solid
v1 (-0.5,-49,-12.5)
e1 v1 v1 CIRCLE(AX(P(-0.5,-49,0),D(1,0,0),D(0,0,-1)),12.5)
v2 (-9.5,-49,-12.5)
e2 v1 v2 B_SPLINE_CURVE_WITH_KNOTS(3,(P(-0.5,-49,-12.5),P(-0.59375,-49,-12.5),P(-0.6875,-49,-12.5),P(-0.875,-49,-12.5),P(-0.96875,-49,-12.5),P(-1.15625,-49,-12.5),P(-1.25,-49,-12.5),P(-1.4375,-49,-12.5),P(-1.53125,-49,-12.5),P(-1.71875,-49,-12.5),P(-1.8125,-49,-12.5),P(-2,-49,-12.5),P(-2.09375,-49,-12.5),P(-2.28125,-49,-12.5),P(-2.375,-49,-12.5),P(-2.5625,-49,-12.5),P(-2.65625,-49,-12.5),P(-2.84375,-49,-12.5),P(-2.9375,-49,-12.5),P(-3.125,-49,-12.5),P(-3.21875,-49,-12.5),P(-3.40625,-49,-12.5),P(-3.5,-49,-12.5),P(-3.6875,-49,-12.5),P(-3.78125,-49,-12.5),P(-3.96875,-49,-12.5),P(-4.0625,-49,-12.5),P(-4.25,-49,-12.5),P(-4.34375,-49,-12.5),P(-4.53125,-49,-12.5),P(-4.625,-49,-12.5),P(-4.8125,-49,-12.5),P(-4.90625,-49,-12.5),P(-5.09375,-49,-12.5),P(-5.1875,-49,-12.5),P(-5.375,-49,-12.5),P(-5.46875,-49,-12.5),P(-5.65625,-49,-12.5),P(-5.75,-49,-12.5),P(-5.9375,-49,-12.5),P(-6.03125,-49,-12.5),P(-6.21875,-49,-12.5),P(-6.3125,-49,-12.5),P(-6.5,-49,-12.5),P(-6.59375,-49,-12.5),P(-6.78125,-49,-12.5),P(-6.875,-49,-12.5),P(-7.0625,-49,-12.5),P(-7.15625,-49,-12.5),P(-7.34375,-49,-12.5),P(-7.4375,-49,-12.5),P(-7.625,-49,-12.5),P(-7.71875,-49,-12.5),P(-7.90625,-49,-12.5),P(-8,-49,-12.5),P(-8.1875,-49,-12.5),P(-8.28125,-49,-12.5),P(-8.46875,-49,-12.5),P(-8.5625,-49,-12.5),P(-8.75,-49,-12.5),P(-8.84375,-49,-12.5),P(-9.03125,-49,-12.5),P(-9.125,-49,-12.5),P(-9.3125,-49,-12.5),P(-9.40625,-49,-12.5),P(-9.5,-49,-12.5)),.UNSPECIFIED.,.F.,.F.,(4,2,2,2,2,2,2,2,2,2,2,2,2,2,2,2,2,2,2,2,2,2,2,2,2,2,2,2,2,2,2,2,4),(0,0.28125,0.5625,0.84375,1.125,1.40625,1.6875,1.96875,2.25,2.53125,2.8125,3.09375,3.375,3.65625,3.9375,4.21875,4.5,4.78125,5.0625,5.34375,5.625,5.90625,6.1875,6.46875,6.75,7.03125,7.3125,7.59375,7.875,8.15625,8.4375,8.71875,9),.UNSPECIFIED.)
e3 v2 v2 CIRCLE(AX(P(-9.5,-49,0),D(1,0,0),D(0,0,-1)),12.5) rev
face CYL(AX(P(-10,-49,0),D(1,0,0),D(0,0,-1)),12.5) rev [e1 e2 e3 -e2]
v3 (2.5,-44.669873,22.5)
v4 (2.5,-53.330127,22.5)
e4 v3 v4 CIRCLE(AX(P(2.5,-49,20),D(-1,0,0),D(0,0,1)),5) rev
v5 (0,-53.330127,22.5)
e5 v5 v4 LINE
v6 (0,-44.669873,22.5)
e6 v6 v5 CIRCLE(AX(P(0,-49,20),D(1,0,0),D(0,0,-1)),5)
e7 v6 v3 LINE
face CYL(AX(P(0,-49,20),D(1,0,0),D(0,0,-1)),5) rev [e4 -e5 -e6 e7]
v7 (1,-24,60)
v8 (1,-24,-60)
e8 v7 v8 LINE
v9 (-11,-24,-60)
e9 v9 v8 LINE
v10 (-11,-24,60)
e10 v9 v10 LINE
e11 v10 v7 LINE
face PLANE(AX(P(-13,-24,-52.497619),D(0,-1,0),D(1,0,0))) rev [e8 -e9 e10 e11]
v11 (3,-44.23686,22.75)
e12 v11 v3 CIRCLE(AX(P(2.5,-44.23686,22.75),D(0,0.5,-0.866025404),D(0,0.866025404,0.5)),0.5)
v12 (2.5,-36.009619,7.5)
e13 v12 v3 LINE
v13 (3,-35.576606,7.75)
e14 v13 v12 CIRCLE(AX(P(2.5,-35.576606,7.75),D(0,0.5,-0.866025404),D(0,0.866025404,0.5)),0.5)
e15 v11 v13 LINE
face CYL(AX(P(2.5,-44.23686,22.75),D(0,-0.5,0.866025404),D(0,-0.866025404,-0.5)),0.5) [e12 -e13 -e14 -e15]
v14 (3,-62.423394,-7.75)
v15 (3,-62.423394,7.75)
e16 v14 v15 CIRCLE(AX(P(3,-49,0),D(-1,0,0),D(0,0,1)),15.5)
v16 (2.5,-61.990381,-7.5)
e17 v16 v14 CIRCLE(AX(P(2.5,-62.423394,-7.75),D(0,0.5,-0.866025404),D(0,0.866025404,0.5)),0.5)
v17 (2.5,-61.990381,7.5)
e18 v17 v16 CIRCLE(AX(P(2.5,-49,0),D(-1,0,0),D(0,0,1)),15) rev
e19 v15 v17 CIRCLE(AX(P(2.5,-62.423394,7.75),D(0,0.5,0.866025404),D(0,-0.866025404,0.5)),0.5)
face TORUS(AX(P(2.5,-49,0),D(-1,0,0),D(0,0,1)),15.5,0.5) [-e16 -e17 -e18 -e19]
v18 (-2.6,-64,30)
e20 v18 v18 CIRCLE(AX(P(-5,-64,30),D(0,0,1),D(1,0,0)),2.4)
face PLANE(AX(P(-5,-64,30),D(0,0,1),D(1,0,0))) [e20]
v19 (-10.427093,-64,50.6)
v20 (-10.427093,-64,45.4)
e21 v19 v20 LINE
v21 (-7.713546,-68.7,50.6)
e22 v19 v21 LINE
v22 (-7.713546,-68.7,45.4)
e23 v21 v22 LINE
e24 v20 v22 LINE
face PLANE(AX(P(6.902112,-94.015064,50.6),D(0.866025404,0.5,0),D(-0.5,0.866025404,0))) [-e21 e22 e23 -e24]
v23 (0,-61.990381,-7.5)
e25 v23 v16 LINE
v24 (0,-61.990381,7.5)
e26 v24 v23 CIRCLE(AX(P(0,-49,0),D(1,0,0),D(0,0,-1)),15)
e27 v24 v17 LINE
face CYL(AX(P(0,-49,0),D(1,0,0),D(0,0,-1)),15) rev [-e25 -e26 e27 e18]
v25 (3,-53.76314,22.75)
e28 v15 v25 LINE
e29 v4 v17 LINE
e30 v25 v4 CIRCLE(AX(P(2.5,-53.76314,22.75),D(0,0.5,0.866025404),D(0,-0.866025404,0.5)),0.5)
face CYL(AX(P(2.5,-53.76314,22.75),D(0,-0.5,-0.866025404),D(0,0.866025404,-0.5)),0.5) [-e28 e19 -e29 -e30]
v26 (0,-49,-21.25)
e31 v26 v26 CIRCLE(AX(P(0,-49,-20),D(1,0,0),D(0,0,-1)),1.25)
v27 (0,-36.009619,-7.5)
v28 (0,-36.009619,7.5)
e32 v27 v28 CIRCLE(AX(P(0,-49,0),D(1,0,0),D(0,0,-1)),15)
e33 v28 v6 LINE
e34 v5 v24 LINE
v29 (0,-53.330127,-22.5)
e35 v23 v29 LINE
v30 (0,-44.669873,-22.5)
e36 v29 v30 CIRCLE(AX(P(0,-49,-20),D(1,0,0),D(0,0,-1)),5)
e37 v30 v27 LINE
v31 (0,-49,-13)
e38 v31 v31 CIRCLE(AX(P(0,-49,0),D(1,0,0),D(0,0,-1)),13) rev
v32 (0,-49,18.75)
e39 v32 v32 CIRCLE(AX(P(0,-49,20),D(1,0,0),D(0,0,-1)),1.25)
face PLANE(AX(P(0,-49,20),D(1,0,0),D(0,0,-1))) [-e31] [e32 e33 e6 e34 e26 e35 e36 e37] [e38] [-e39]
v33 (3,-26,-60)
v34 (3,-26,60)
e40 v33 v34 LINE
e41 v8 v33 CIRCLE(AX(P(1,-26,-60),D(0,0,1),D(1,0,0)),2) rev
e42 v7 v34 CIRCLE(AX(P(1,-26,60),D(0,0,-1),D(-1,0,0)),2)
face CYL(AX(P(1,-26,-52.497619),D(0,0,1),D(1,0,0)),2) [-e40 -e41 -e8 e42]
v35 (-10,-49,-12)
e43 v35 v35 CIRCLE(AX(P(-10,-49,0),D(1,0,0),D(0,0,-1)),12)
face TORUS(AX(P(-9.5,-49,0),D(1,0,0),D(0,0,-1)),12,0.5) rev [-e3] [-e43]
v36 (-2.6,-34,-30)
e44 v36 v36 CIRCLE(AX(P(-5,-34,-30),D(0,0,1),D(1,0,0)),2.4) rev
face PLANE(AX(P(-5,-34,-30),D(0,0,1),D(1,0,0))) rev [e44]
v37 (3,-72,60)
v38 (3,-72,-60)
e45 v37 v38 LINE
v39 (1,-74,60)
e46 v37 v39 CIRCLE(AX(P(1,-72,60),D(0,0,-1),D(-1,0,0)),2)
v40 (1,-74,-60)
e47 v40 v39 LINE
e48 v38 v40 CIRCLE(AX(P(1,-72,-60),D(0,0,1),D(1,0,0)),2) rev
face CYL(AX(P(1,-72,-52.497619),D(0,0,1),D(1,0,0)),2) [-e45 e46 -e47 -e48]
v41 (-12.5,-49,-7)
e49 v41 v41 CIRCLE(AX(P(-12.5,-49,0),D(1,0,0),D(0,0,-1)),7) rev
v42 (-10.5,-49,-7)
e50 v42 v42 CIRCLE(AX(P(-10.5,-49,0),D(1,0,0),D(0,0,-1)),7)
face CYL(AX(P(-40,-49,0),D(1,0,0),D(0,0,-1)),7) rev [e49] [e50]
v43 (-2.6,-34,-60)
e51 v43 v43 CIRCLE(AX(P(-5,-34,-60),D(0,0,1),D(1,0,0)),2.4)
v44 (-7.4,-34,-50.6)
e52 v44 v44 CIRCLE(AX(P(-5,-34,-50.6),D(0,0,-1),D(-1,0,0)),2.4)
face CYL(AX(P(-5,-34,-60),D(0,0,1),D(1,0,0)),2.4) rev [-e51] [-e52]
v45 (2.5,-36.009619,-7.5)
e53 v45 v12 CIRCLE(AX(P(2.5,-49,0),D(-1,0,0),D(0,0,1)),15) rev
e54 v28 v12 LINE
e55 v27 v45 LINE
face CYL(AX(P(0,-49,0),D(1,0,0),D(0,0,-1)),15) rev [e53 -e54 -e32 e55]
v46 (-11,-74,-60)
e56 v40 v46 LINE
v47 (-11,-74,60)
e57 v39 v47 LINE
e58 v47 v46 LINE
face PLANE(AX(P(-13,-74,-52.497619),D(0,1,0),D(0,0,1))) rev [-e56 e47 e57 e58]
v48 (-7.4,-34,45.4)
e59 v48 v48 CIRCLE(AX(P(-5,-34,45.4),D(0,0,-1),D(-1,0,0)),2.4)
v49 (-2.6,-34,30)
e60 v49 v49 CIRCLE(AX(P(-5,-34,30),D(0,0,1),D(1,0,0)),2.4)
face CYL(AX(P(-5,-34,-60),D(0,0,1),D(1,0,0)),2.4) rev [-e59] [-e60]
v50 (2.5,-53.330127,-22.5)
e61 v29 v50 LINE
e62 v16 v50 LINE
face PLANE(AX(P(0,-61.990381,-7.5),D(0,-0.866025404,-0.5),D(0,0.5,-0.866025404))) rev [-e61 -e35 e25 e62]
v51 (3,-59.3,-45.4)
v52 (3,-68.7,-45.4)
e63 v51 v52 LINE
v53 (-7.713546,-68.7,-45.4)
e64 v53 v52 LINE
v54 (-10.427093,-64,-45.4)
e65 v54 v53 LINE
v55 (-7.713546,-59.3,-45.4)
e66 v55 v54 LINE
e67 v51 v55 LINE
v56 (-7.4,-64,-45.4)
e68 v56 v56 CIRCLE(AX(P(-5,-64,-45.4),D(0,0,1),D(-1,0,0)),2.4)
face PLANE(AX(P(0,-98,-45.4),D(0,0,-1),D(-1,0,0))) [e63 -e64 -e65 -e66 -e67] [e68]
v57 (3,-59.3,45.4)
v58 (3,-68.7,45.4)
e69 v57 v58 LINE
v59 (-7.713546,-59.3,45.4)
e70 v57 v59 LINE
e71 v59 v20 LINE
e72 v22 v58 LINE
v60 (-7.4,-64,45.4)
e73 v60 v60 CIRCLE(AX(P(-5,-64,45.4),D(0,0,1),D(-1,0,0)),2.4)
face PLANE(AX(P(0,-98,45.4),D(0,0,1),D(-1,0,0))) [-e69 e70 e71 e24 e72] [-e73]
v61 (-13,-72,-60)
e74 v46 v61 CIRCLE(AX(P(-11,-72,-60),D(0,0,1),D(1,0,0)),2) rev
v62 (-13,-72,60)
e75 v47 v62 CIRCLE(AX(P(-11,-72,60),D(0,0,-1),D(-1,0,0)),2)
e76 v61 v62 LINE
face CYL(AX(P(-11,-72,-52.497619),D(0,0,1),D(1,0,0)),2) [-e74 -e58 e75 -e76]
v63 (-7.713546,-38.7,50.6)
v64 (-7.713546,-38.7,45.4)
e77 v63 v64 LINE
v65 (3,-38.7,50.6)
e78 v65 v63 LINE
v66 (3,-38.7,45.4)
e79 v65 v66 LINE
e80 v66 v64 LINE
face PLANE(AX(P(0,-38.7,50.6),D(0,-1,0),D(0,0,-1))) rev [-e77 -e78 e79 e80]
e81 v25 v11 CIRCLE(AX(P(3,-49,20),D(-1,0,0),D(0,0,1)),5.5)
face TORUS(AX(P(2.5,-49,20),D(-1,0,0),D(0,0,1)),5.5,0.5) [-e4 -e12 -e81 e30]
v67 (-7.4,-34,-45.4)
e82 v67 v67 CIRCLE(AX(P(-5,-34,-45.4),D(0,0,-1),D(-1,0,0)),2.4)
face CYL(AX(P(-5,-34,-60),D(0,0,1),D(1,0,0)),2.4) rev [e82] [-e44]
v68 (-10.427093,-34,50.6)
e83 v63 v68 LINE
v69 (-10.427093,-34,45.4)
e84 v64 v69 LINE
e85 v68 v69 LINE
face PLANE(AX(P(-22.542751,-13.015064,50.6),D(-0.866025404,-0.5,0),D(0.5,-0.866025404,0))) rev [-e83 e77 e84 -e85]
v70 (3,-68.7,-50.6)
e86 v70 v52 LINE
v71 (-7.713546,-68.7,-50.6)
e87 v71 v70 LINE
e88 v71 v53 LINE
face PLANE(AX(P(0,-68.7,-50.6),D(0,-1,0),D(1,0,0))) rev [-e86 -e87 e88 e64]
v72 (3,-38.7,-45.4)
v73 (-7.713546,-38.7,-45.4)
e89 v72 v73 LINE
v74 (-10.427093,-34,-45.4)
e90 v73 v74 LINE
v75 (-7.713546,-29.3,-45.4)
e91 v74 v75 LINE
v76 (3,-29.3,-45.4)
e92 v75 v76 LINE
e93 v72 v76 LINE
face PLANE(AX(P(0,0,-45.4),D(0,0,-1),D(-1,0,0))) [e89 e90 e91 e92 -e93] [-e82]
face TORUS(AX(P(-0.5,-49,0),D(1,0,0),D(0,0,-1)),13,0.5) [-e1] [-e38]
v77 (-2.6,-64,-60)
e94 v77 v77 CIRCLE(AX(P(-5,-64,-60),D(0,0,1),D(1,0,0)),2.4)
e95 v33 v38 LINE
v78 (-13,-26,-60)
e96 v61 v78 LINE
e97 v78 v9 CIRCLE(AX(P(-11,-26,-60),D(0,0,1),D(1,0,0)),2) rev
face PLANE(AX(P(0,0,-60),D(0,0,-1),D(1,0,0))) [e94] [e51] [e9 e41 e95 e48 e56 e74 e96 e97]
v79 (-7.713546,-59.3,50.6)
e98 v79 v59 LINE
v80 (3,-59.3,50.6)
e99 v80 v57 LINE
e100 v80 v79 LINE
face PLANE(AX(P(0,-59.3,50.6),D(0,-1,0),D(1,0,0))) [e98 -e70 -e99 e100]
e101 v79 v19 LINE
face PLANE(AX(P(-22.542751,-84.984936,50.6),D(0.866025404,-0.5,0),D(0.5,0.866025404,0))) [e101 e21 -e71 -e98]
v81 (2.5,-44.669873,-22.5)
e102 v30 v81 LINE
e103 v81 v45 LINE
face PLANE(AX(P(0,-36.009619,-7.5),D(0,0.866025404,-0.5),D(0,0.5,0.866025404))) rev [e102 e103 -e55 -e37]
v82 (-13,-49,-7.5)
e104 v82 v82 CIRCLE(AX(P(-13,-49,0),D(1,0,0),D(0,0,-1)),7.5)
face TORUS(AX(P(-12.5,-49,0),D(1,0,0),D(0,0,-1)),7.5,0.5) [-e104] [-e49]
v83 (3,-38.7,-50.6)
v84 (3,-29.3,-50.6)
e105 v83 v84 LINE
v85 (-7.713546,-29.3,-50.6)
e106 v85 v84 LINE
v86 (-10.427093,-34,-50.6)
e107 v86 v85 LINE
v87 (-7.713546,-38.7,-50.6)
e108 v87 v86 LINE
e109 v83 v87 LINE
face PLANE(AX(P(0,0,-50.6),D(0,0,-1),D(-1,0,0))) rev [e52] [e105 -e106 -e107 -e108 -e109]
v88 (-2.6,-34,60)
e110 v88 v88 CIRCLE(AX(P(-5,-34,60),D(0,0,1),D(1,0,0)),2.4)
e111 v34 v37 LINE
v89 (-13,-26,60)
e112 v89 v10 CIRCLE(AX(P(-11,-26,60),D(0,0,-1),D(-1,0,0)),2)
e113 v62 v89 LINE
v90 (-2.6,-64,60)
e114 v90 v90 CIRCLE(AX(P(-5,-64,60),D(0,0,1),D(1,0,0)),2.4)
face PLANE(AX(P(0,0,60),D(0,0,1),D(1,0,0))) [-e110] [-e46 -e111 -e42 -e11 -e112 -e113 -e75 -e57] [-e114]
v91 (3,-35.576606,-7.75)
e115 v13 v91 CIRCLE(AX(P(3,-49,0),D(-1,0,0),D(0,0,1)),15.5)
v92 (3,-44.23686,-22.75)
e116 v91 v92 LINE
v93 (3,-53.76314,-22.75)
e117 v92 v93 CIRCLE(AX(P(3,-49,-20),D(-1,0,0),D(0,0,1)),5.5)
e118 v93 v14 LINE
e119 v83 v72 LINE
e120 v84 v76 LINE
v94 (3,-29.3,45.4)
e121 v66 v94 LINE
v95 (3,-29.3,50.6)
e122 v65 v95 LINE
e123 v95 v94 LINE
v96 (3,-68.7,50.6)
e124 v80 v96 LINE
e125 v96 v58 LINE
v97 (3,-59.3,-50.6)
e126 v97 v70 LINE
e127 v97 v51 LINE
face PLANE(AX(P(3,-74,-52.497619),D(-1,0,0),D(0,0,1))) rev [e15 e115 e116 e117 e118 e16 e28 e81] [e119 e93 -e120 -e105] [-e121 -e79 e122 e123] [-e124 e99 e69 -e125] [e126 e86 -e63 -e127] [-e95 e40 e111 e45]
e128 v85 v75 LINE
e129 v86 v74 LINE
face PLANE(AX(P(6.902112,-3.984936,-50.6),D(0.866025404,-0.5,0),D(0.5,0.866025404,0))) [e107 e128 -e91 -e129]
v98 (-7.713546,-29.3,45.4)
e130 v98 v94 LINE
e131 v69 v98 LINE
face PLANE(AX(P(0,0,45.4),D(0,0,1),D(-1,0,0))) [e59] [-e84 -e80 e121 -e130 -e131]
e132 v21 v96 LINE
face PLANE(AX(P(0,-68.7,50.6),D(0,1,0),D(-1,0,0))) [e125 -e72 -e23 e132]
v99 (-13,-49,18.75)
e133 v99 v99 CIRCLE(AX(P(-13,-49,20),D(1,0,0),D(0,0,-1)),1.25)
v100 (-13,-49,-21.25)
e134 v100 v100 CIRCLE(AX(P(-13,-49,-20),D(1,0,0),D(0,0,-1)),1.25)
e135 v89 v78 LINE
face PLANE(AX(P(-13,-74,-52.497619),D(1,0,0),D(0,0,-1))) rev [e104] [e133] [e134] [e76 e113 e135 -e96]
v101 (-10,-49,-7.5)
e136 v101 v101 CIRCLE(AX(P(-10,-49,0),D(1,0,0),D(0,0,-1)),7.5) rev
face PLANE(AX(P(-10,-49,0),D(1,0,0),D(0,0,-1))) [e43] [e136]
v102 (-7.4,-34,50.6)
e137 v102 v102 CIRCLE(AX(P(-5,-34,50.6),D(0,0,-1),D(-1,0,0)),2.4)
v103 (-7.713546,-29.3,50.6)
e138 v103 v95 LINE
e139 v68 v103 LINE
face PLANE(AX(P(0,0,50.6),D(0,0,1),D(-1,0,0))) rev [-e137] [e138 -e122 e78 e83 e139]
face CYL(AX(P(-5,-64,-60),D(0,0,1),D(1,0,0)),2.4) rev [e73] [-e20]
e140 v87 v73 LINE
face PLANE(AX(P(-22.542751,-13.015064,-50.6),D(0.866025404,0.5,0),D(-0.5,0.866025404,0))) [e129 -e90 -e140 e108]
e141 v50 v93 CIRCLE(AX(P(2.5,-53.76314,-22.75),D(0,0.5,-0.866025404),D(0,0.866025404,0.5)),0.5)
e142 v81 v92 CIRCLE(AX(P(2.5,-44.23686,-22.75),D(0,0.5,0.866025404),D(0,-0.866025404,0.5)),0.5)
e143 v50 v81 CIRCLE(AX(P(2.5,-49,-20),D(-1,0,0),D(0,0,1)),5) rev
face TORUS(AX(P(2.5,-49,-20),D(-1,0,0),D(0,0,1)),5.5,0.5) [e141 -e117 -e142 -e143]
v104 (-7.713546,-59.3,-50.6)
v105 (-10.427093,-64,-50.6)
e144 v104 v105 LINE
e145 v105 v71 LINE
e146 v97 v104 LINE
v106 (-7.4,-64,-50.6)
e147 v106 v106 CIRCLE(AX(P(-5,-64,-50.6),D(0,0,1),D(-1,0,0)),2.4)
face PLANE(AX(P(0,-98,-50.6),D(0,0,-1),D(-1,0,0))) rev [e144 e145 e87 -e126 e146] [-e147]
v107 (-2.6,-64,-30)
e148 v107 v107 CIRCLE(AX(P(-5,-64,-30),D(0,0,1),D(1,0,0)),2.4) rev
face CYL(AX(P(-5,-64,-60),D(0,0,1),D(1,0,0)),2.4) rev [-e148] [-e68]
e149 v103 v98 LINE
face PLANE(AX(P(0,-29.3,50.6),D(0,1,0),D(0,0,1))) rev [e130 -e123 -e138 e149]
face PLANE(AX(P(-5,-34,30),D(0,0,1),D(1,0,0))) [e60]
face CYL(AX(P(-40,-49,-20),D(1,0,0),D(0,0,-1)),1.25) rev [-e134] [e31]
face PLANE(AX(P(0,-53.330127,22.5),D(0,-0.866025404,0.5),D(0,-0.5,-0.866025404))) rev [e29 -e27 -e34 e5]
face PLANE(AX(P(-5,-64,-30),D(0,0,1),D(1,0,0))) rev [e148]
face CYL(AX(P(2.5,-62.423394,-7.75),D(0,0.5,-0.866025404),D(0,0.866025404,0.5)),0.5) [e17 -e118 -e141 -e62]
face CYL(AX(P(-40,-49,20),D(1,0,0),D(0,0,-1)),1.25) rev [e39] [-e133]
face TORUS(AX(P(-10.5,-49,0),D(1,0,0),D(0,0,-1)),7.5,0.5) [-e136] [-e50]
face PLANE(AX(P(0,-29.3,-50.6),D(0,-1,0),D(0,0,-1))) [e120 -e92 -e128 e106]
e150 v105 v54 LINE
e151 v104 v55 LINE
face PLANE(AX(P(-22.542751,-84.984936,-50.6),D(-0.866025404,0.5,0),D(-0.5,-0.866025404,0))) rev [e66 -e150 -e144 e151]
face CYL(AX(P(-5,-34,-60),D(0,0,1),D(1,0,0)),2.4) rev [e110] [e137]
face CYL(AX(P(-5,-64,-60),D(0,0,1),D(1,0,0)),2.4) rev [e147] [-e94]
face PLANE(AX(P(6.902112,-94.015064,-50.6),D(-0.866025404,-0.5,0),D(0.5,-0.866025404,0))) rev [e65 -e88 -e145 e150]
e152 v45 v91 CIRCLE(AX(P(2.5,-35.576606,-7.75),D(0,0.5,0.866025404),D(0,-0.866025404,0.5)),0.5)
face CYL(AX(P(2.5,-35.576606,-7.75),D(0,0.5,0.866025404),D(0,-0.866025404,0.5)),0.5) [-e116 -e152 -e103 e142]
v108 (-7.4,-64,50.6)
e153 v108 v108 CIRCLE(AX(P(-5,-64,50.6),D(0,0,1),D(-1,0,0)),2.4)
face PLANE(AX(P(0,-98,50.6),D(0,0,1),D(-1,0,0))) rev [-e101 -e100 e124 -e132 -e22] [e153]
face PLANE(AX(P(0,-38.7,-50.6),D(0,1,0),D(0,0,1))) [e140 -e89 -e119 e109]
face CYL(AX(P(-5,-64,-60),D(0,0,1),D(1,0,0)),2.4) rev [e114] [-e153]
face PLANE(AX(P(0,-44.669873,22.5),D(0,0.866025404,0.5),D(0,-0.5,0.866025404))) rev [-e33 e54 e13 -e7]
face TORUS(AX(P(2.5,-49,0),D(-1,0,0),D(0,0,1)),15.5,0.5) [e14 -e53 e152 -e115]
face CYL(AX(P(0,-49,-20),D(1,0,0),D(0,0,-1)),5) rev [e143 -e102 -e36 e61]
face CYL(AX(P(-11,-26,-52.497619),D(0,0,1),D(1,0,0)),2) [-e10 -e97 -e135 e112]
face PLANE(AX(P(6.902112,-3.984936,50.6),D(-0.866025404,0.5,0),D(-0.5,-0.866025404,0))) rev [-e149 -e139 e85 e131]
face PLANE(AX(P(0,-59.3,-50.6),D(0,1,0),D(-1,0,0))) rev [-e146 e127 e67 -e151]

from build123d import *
from build123d.topology import SkipClean

# Parameters (mm, degrees)
SKETCH2_R                = 12.5
BOSS_EXTRUDE1_DEPTH      = 15
SKETCH13_W               = 16
SKETCH13_H               = 50
BOSS_EXTRUDE5_DEPTH      = 45
SKETCH14_R               = 12.5
CUT_EXTRUDE1_DEPTH       = 13
SKETCH15_R               = 1.25
CUT_EXTRUDE2_DEPTH       = 3
SKETCH16_R               = 7
SKETCH16_R_2             = 1.25
CUT_EXTRUDE3_DEPTH       = 116.628716156
FILLET3_R                = 0.5
FILLET4_R                = 0.5
FILLET5_R                = 0.5
BOSS_EXTRUDE7_DEPTH      = 15
BOSS_EXTRUDE8_START      = 10
SKETCH23_R               = 22
SKETCH23_R_2             = 12.5
BOSS_EXTRUDE8_DEPTH      = 10
SKETCH24_R               = 12.5
CUT_EXTRUDE4_DEPTH       = 147.049569685
SKETCH25_R               = 12.5
SKETCH25_R_2             = 7
BOSS_EXTRUDE9_DEPTH      = 2
CUT_EXTRUDE5_DEPTH       = 3
SKETCH27_R               = 1.15
CUT_EXTRUDE6_DEPTH       = 8
SKETCH28_R               = 20
BOSS_EXTRUDE10_DEPTH     = 2
BOSS_EXTRUDE11_DEPTH     = 20
SKETCH30_R               = 5
CUT_EXTRUDE7_DEPTH       = 10
SKETCH31_R               = 1.9
CUT_EXTRUDE8_DEPTH       = 12
CUT_EXTRUDE9_DEPTH       = 3
SKETCH33_R               = 1.15
CUT_EXTRUDE10_DEPTH      = 8
FILLET6_R                = 1
FILLET7_R                = 1
FILLET8_R                = 2
FILLET9_R                = 2
SKETCH35_R               = 2.4
CUT_EXTRUDE12_DEPTH      = 164.418104317
CUT_EXTRUDE15_DEPTH      = 153.743172808
SKETCH41_W               = 165.446496504
SKETCH41_H               = 185.397374106
CUT_EXTRUDE16_DEPTH      = 153.74317274
SKETCH42_R               = 2.4
BOSS_EXTRUDE12_DEPTH     = 30
SKETCH44_R               = 2.4
CUT_EXTRUDE17_DEPTH      = 2.6
MIRROR16_COPY_1_SKETCH_R = 2.4
MIRROR16_COPY_1_DEPTH    = 2.6


# Some blends are built 0.0001 mm under size
with BuildPart() as part:
    # Sketch2 → Boss-Extrude1 (new body)
    with BuildSketch(Plane.XY.offset(60)):
        with BuildLine():
            Line((-39.322032275, -7.333333333), (-28.508473399, -65.316666667))
            ThreePointArc((-28.508473399, -65.316666667), (0, -89), (28.508473399, -65.316666667))
            Line((28.508473399, -65.316666667), (39.322032275, -7.333333333))
            ThreePointArc((39.322032275, -7.333333333), (0, 40), (-39.322032275, -7.333333333))
        make_face()
        Circle(SKETCH2_R, mode=Mode.SUBTRACT)
    boss_extrude1 = extrude(amount=-BOSS_EXTRUDE1_DEPTH)

    # Sketch13 → Boss-Extrude5 (add)
    with BuildSketch(Plane(origin=(0, 0, 45), x_dir=(-1, 0, 0), z_dir=(0, 0, -1))):
        with Locations((5, -49)):
            Rectangle(SKETCH13_W, SKETCH13_H)
    boss_extrude5 = extrude(amount=BOSS_EXTRUDE5_DEPTH)

    # Mirror2: Boss-Extrude5 across plane
    add(boss_extrude5.mirror(Plane.XY))

    # Mirror4: Boss-Extrude1 across plane
    add(boss_extrude1.mirror(Plane.XY))

    # Sketch14 → Cut-Extrude1 (cut)
    with BuildSketch(Plane(origin=(3, 0, 0), x_dir=(0, 0, -1), z_dir=(1, 0, 0))):
        with Locations((0, -49)):
            Circle(SKETCH14_R)
    extrude(amount=-CUT_EXTRUDE1_DEPTH, mode=Mode.SUBTRACT)

    # Sketch15 → Cut-Extrude2 (cut)
    with BuildSketch(Plane(origin=(3, 0, 0), x_dir=(0, 0, -1), z_dir=(1, 0, 0))):
        with BuildLine():
            Line((-22.5, -44.669872981), (-7.5, -36.009618943))
            ThreePointArc((-7.5, -36.009618943), (0, -34), (7.5, -36.009618943))
            Line((7.5, -36.009618943), (22.5, -44.669872981))
            ThreePointArc((22.5, -44.669872981), (25, -49), (22.5, -53.330127019))
            Line((22.5, -53.330127019), (7.5, -61.990381057))
            ThreePointArc((7.5, -61.990381057), (0, -64), (-7.5, -61.990381057))
            Line((-7.5, -61.990381057), (-22.5, -53.330127019))
            ThreePointArc((-22.5, -53.330127019), (-25, -49), (-22.5, -44.669872981))
        make_face()
        with Locations((20, -49)):
            Circle(SKETCH15_R, mode=Mode.SUBTRACT)
        with Locations((-20, -49)):
            Circle(SKETCH15_R, mode=Mode.SUBTRACT)
    extrude(amount=-CUT_EXTRUDE2_DEPTH, mode=Mode.SUBTRACT)

    # Sketch16 → Cut-Extrude3 (cut, through all)
    with BuildSketch(Plane(origin=(3, 0, 0), x_dir=(0, 0, -1), z_dir=(1, 0, 0))):
        with Locations((0, -49)):
            Circle(SKETCH16_R)
        with Locations((20, -49)):
            Circle(SKETCH16_R_2)
        with Locations((-20, -49)):
            Circle(SKETCH16_R_2)
    extrude(amount=-CUT_EXTRUDE3_DEPTH, mode=Mode.SUBTRACT)

    # Fillet3
    fillet3_edges = [part.edges().sort_by_distance(p)[0] for p in [
        (-10, -49, 7),
        (-10, -49, 12.5),
        (0, -49, 12.5),
    ]]
    fillet(fillet3_edges, radius=FILLET3_R)

    # Fillet4
    fillet4_edges = [part.edges().sort_by_distance(p)[0] for p in [
        (-13, -49, 7),
    ]]
    fillet(fillet4_edges, radius=FILLET4_R)

    # Fillet5
    fillet5_edges = [part.edges().sort_by_distance(p)[0] for p in [
        (3, -49, 25),
        (3, -57.660254038, 15),
        (3, -64, 0),
        (3, -57.660254038, -15),
        (3, -49, -25),
        (3, -40.339745962, -15),
        (3, -34, 0),
        (3, -40.339745962, 15),
    ]]
    fillet(fillet5_edges, radius=FILLET5_R)

    # Sketch21 → Boss-Extrude7 (add)
    with BuildSketch(Plane(origin=(0, 0, 45), x_dir=(-1, 0, 0), z_dir=(0, 0, -1))):
        with BuildLine():
            Line((63.949121417, -39.274799426), (35.879526324, 17.682182861))
            ThreePointArc((35.879526324, 17.682182861), (39.626539296, 5.453199377), (39.322032275, -7.333333333))
            Line((39.322032275, -7.333333333), (32.183280175, -45.612002486))
            ThreePointArc((32.183280175, -45.612002486), (45.925459124, -36.617527064), (56.715381939, -49))
            ThreePointArc((56.715381939, -49), (43.626354657, -61.486114162), (31.770894441, -47.823254098))
            Line((31.770894441, -47.823254098), (28.508473399, -65.316666667))
            ThreePointArc((28.508473399, -65.316666667), (22.576057553, -78.202242316), (11.241719496, -86.732447377))
            Line((11.241719496, -86.732447377), (52.743582936, -69.279787666))
            ThreePointArc((52.743582936, -69.279787666), (64.82506776, -56.696807802), (63.949121417, -39.274799426))
        make_face()
        with BuildLine():
            ThreePointArc((39.322032275, -7.333333333), (39.626539296, 5.453199377), (35.879526324, 17.682182861))
            Line((35.879526324, 17.682182861), (11.241719496, -86.732447377))
            ThreePointArc((11.241719496, -86.732447377), (22.576057553, -78.202242316), (28.508473399, -65.316666667))
            Line((28.508473399, -65.316666667), (31.770894441, -47.823254098))
            ThreePointArc((31.770894441, -47.823254098), (31.927246853, -46.708333333), (32.183280175, -45.612002486))
            Line((32.183280175, -45.612002486), (39.322032275, -7.333333333))
        make_face()
    boss_extrude7 = extrude(amount=-BOSS_EXTRUDE7_DEPTH)

    # Sketch23 → Boss-Extrude8 (add)
    with SkipClean():  # the faces are left unmerged after this step: merging them gives an invalid solid
        with BuildSketch(Plane(origin=(0, 0, 45), x_dir=(-1, 0, 0), z_dir=(0, 0, -1)).offset(BOSS_EXTRUDE8_START)):
            with Locations((44.215381939, -49)):
                Circle(SKETCH23_R)
            with Locations((44.215381939, -49)):
                Circle(SKETCH23_R_2, mode=Mode.SUBTRACT)
        boss_extrude8 = extrude(amount=-BOSS_EXTRUDE8_DEPTH)

    # Sketch24 → Cut-Extrude4 (cut, through all)
    with SkipClean():  # the faces are left unmerged after this step: merging them gives an invalid solid
        with BuildSketch(Plane(origin=(0, 0, 35), x_dir=(-1, 0, 0), z_dir=(0, 0, -1))):
            with Locations((44.215381939, -49)):
                Circle(SKETCH24_R)
        cut_extrude4 = extrude(amount=-CUT_EXTRUDE4_DEPTH, mode=Mode.SUBTRACT)
    add(part.part.scale(1), mode=Mode.REPLACE)  # the faces are merged on a copy

    # Sketch25 → Boss-Extrude9 (add)
    with BuildSketch(Plane(origin=(0, 0, 35), x_dir=(-1, 0, 0), z_dir=(0, 0, -1))):
        with Locations((44.215381939, -49)):
            Circle(SKETCH25_R)
        with Locations((44.215381939, -49)):
            Circle(SKETCH25_R_2, mode=Mode.SUBTRACT)
    boss_extrude9 = extrude(amount=-BOSS_EXTRUDE9_DEPTH)

    # Sketch26 → Cut-Extrude5 (cut)
    with BuildSketch(Plane.XY.offset(60)):
        with BuildLine():
            Line((-34.573567794, -37.509333353), (-47.841846757, -26.375925369))
            ThreePointArc((-47.841846757, -26.375925369), (-52.765885522, -25.50768448), (-55.97982357, -29.337906696))
            Line((-55.97982357, -29.337906696), (-58.987498234, -46.395277335))
            ThreePointArc((-58.987498234, -46.395277335), (-58.310771251, -54.13030215), (-53.857196084, -60.490666647))
            Line((-53.857196084, -60.490666647), (-40.588917121, -71.624074631))
            ThreePointArc((-40.588917121, -71.624074631), (-35.664878356, -72.49231552), (-32.450940307, -68.662093304))
            Line((-32.450940307, -68.662093304), (-29.443265644, -51.604722665))
            ThreePointArc((-29.443265644, -51.604722665), (-30.119992627, -43.86969785), (-34.573567794, -37.509333353))
        make_face()
    cut_extrude5 = extrude(amount=-CUT_EXTRUDE5_DEPTH, mode=Mode.SUBTRACT)

    # Sketch27 → Cut-Extrude6 (cut)
    with BuildSketch(Plane.XY.offset(57)):
        with Locations((-51.055784805, -30.206147584)):
            Circle(SKETCH27_R)
        with Locations((-37.374979072, -67.793852416)):
            Circle(SKETCH27_R)
    cut_extrude6 = extrude(amount=-CUT_EXTRUDE6_DEPTH, mode=Mode.SUBTRACT)

    # Mirror12: Boss-Extrude7, Boss-Extrude8, Cut-Extrude4, Boss-Extrude9, Cut-Extrude5, Cut-Extrude6 across plane
    with SkipClean():  # the faces are left unmerged after this step: merging them gives an invalid solid
        add(boss_extrude7.mirror(Plane.XY))
        add(boss_extrude8.mirror(Plane.XY))
        add(cut_extrude4.mirror(Plane.XY), mode=Mode.SUBTRACT)
        add(boss_extrude9.mirror(Plane.XY))
        add(cut_extrude5.mirror(Plane.XY), mode=Mode.SUBTRACT)
        add(cut_extrude6.mirror(Plane.XY), mode=Mode.SUBTRACT)

    # Sketch28 → Boss-Extrude10 (add)
    with SkipClean():  # the faces are left unmerged after this step: merging them gives an invalid solid
        with BuildSketch(Plane(origin=(0, 0, 45), x_dir=(-1, 0, 0), z_dir=(0, 0, -1))):
            Circle(SKETCH28_R)
        boss_extrude10 = extrude(amount=-BOSS_EXTRUDE10_DEPTH)

    # Sketch29 → Boss-Extrude11 (add)
    with SkipClean():  # the faces are left unmerged after this step: merging them gives an invalid solid
        with BuildSketch(Plane(origin=(0, 0, 45), x_dir=(-1, 0, 0), z_dir=(0, 0, -1))):
            with BuildLine():
                Line((-20, 0), (20, 0))
                ThreePointArc((20, 0), (0, -20), (-20, 0))
            make_face()
        boss_extrude11 = extrude(amount=BOSS_EXTRUDE11_DEPTH)

    # Sketch30 → Cut-Extrude7 (cut)
    with SkipClean():  # the faces are left unmerged after this step: merging them gives an invalid solid
        with BuildSketch(Plane(origin=(0, 0, 25), x_dir=(-1, 0, 0), z_dir=(0, 0, -1))):
            Circle(SKETCH30_R)
        cut_extrude7 = extrude(amount=-CUT_EXTRUDE7_DEPTH, mode=Mode.SUBTRACT)

    # Sketch31 → Cut-Extrude8 (cut)
    with SkipClean():  # the faces are left unmerged after this step: merging them gives an invalid solid
        with BuildSketch(Plane(origin=(0, 0, 0), x_dir=(1, 0, 0), z_dir=(0, 1, 0))):
            with Locations(Location((-12.5, -35, 0), (0, 0, 270))):
                Circle(SKETCH31_R)
            with Locations(Location((12.5, -35, 0), (0, 0, 270))):
                Circle(SKETCH31_R)
        cut_extrude8 = extrude(amount=-CUT_EXTRUDE8_DEPTH, mode=Mode.SUBTRACT)

    # Sketch32 → Cut-Extrude9 (cut)
    with SkipClean():  # the faces are left unmerged after this step: merging them gives an invalid solid
        with BuildSketch(Plane(origin=(-30.922387151, 58.307855156, 60), x_dir=(0.34202014332566366, 0.9396926207859102, 0), z_dir=(0, 0, 1))):
            with BuildLine():
                Line((-34.573567794, -37.509333353), (-47.841846757, -26.375925369))
                ThreePointArc((-47.841846757, -26.375925369), (-52.765885522, -25.50768448), (-55.97982357, -29.337906696))
                Line((-55.97982357, -29.337906696), (-58.987498234, -46.395277335))
                ThreePointArc((-58.987498234, -46.395277335), (-58.310771251, -54.13030215), (-53.857196084, -60.490666647))
                Line((-53.857196084, -60.490666647), (-40.588917121, -71.624074631))
                ThreePointArc((-40.588917121, -71.624074631), (-35.664878356, -72.49231552), (-32.450940307, -68.662093304))
                Line((-32.450940307, -68.662093304), (-29.443265644, -51.604722665))
                ThreePointArc((-29.443265644, -51.604722665), (-30.119992627, -43.86969785), (-34.573567794, -37.509333353))
            make_face()
        cut_extrude9 = extrude(amount=-CUT_EXTRUDE9_DEPTH, mode=Mode.SUBTRACT)

    # Sketch33 → Cut-Extrude10 (cut)
    with SkipClean():  # the faces are left unmerged after this step: merging them gives an invalid solid
        with BuildSketch(Plane.XY.offset(57)):
            with Locations((20, 0)):
                Circle(SKETCH33_R)
            with Locations((-20, 0)):
                Circle(SKETCH33_R)
        cut_extrude10 = extrude(amount=-CUT_EXTRUDE10_DEPTH, mode=Mode.SUBTRACT)

    # Mirror13: Boss-Extrude10, Boss-Extrude11, Cut-Extrude7, Cut-Extrude8, Cut-Extrude9, Cut-Extrude10 across plane
    with SkipClean():  # the faces are left unmerged after this step: merging them gives an invalid solid
        add(boss_extrude10.mirror(Plane.XY))
        add(boss_extrude11.mirror(Plane.XY))
        add(cut_extrude7.mirror(Plane.XY), mode=Mode.SUBTRACT)
        add(cut_extrude8.mirror(Plane.XY), mode=Mode.SUBTRACT)
        add(cut_extrude9.mirror(Plane.XY), mode=Mode.SUBTRACT)
        add(cut_extrude10.mirror(Plane.XY), mode=Mode.SUBTRACT)

    # Fillet6
    # the kernel refuses this fillet: 1 mm, written as the material it takes off along each edge
    with BuildSketch(Plane(origin=(0, -60, 60), x_dir=(-0.38764549985050817, -0.9218085302521613, 0), z_dir=(-0.9218085302521613, 0.38764549985050817, 0))) as fillet6_piece_1:
        with BuildLine():
            CenterArc((29 - FILLET6_R, -FILLET6_R), FILLET6_R, 0, 90)
            Line((29 - FILLET6_R, 0), (29, 0))
            Line((29, 0), (29, -FILLET6_R))
        make_face()
    revolve(axis=Axis((0, -60, 60), (0, 0, 1)), revolution_arc=102.244097048, mode=Mode.SUBTRACT)
    with BuildSketch(Plane(origin=(0, -60, 45), x_dir=(-0.38764549985050817, -0.9218085302521613, 0), z_dir=(-0.9218085302521613, 0.38764549985050817, 0))) as fillet6_piece_2:
        with BuildLine():
            CenterArc((29 - FILLET6_R, FILLET6_R), FILLET6_R, 270, 90)
            Line((29, FILLET6_R), (29, 0))
            Line((29, 0), (29 - FILLET6_R, 0))
        make_face()
    revolve(axis=Axis((0, -60, 45), (0, 0, 1)), revolution_arc=102.244097048, mode=Mode.SUBTRACT)
    with BuildSketch(Plane(origin=(-63.949121417, -39.274799426, 60), x_dir=(0, 0, -1), z_dir=(0.4420545715370929, 0.8969881581064252, 0))) as fillet6_piece_3:
        with BuildLine():
            CenterArc((FILLET6_R, -FILLET6_R), FILLET6_R, 90, 90)
            Line((0, -FILLET6_R), (0, 0))
            Line((0, 0), (FILLET6_R, 0))
        make_face()
    extrude(amount=63.498031466, mode=Mode.SUBTRACT)
    with BuildSketch(Plane(origin=(-11.241719496, -86.732447377, 45), x_dir=(0.38764549985050845, 0.9218085302521613, 0), z_dir=(-0.9218085302521611, 0.38764549985050845, 0))) as fillet6_piece_4_section:
        with BuildLine():
            CenterArc((FILLET6_R, -FILLET6_R), FILLET6_R, 90, 90)
            Line((0, -FILLET6_R), (0, 0))
            Line((0, 0), (FILLET6_R, 0))
        make_face()
    fillet6_piece_4 = extrude(amount=52.522216738, mode=Mode.PRIVATE)
    fillet6_piece_4 = fillet6_piece_4 - Plane(origin=(-44.215381939, -49, 45), x_dir=(-1, 0, 0), z_dir=(0, 0, -1)) * Cylinder(22, 110, mode=Mode.PRIVATE)
    add(fillet6_piece_4, mode=Mode.SUBTRACT)
    with BuildSketch(Plane(origin=(-44.215381939, -49, 60), x_dir=(-0.3876454998505073, -0.9218085302521616, 0), z_dir=(0.9218085302521616, -0.3876454998505073, 0))) as fillet6_piece_5:
        with BuildLine():
            CenterArc((22 - FILLET6_R, FILLET6_R), FILLET6_R, 270, 90)
            Line((22 - FILLET6_R, 0), (22, 0))
            Line((22, 0), (22, FILLET6_R))
        make_face()
    revolve(axis=Axis((-44.215381939, -49, 60), (0, 0, -1)), revolution_arc=93.426969898, mode=Mode.SUBTRACT)
    with BuildSketch(Plane(origin=(-11.241719496, -86.732447377, 60), x_dir=(0, 0, -1), z_dir=(-0.9218085302521611, 0.38764549985050845, 0))) as fillet6_piece_6:
        with BuildLine():
            CenterArc((FILLET6_R, -FILLET6_R), FILLET6_R, 90, 90)
            Line((0, -FILLET6_R), (0, 0))
            Line((0, 0), (FILLET6_R, 0))
        make_face()
    extrude(amount=45.022216738, mode=Mode.SUBTRACT)
    with BuildSketch(Plane(origin=(-67.264530704, -46.002210612, 45), x_dir=(0.8969881581064253, -0.4420545715370929, 0), z_dir=(0.4420545715370929, 0.8969881581064252, 0))) as fillet6_piece_7_section:
        with BuildLine():
            CenterArc((FILLET6_R, -FILLET6_R), FILLET6_R, 90, 90)
            Line((0, -FILLET6_R), (0, 0))
            Line((0, 0), (FILLET6_R, 0))
        make_face()
    fillet6_piece_7 = extrude(amount=70.998031466, mode=Mode.PRIVATE)
    fillet6_piece_7 = fillet6_piece_7 - Plane(origin=(-44.215381939, -49, 45), x_dir=(-1, 0, 0), z_dir=(0, 0, -1)) * Cylinder(22, 146, mode=Mode.PRIVATE)
    add(fillet6_piece_7, mode=Mode.SUBTRACT)
    with BuildSketch(Plane(origin=(28.508473399, -65.316666667, 45), x_dir=(-0.9830508068705752, 0.18333333333333338, 0), z_dir=(0.1833333333333334, 0.9830508068705752, 0)), Plane(origin=(28.508473399, -65.316666667, 60), x_dir=(0, 0, -1), z_dir=(0.1833333333333334, 0.9830508068705752, 0))) as fillet6_piece_8:
        with BuildLine():
            CenterArc((FILLET6_R, FILLET6_R), FILLET6_R, 180, 90)
            Line((0, FILLET6_R), (0, 0))
            Line((0, 0), (FILLET6_R, 0))
        make_face()
    extrude(amount=58.983048412, mode=Mode.SUBTRACT)
    with BuildSketch(Plane(origin=(0, -60, -60), x_dir=(-0.38764549985050817, -0.9218085302521613, 0), z_dir=(-0.9218085302521613, 0.38764549985050817, 0))) as fillet6_piece_9:
        with BuildLine():
            CenterArc((29 - FILLET6_R, FILLET6_R), FILLET6_R, 270, 90)
            Line((29 - FILLET6_R, 0), (29, 0))
            Line((29, 0), (29, FILLET6_R))
        make_face()
    revolve(axis=Axis((0, -60, -60), (0, 0, 1)), revolution_arc=102.244097048, mode=Mode.SUBTRACT)
    with BuildSketch(Plane(origin=(0, -60, -45), x_dir=(-0.38764549985050817, -0.9218085302521613, 0), z_dir=(-0.9218085302521613, 0.38764549985050817, 0))) as fillet6_piece_10:
        with BuildLine():
            CenterArc((29 - FILLET6_R, -FILLET6_R), FILLET6_R, 0, 90)
            Line((29, -FILLET6_R), (29, 0))
            Line((29, 0), (29 - FILLET6_R, 0))
        make_face()
    revolve(axis=Axis((0, -60, -45), (0, 0, 1)), revolution_arc=102.244097048, mode=Mode.SUBTRACT)
    with BuildSketch(Plane(origin=(-11.241719496, -86.732447377, -60), x_dir=(0, 0, 1), z_dir=(-0.9218085302521611, 0.38764549985050845, 0))) as fillet6_piece_11:
        with BuildLine():
            CenterArc((FILLET6_R, FILLET6_R), FILLET6_R, 180, 90)
            Line((0, FILLET6_R), (0, 0))
            Line((0, 0), (FILLET6_R, 0))
        make_face()
    extrude(amount=45.022216738, mode=Mode.SUBTRACT)
    with BuildSketch(Plane(origin=(-44.215381939, -49, -60), x_dir=(-0.3876454998505073, -0.9218085302521616, 0), z_dir=(0.9218085302521616, -0.3876454998505073, 0))) as fillet6_piece_12:
        with BuildLine():
            CenterArc((22 - FILLET6_R, -FILLET6_R), FILLET6_R, 0, 90)
            Line((22 - FILLET6_R, 0), (22, 0))
            Line((22, 0), (22, -FILLET6_R))
        make_face()
    revolve(axis=Axis((-44.215381939, -49, -60), (0, 0, -1)), revolution_arc=93.426969898, mode=Mode.SUBTRACT)
    with BuildSketch(Plane(origin=(-67.264530704, -46.002210612, -45), x_dir=(0.8969881581064253, -0.4420545715370929, 0), z_dir=(0.4420545715370929, 0.8969881581064252, 0))) as fillet6_piece_13_section:
        with BuildLine():
            CenterArc((FILLET6_R, FILLET6_R), FILLET6_R, 180, 90)
            Line((0, FILLET6_R), (0, 0))
            Line((0, 0), (FILLET6_R, 0))
        make_face()
    fillet6_piece_13 = extrude(amount=70.998031466, mode=Mode.PRIVATE)
    fillet6_piece_13 = fillet6_piece_13 - Plane(origin=(-44.215381939, -49, -45), x_dir=(-1, 0, 0), z_dir=(0, 0, 1)) * Cylinder(22, 146, mode=Mode.PRIVATE)
    add(fillet6_piece_13, mode=Mode.SUBTRACT)
    with BuildSketch(Plane(origin=(-63.949121417, -39.274799426, -60), x_dir=(0, 0, 1), z_dir=(0.4420545715370929, 0.8969881581064252, 0))) as fillet6_piece_14:
        with BuildLine():
            CenterArc((FILLET6_R, FILLET6_R), FILLET6_R, 180, 90)
            Line((0, FILLET6_R), (0, 0))
            Line((0, 0), (FILLET6_R, 0))
        make_face()
    extrude(amount=63.498031466, mode=Mode.SUBTRACT)
    with BuildSketch(Plane(origin=(-11.241719496, -86.732447377, -45), x_dir=(0.38764549985050845, 0.9218085302521613, 0), z_dir=(-0.9218085302521611, 0.38764549985050845, 0))) as fillet6_piece_15_section:
        with BuildLine():
            CenterArc((FILLET6_R, FILLET6_R), FILLET6_R, 180, 90)
            Line((0, FILLET6_R), (0, 0))
            Line((0, 0), (FILLET6_R, 0))
        make_face()
    fillet6_piece_15 = extrude(amount=52.522216738, mode=Mode.PRIVATE)
    fillet6_piece_15 = fillet6_piece_15 - Plane(origin=(-44.215381939, -49, -45), x_dir=(-1, 0, 0), z_dir=(0, 0, 1)) * Cylinder(22, 110, mode=Mode.PRIVATE)
    add(fillet6_piece_15, mode=Mode.SUBTRACT)
    with BuildSketch(Plane(origin=(0, 0, -45), x_dir=(0.9830508068705752, -0.18333333333333324, 0), z_dir=(-0.18333333333333324, -0.9830508068705752, 0))) as fillet6_piece_16:
        with BuildLine():
            CenterArc((40 - FILLET6_R, -FILLET6_R), FILLET6_R, 0, 90)
            Line((40, -FILLET6_R), (40, 0))
            Line((40, 0), (40 - FILLET6_R, 0))
        make_face()
    revolve(axis=Axis((0, 0, -45), (0, 0, 1)), revolution_arc=164.328933054, mode=Mode.SUBTRACT)
    with BuildSketch(Plane(origin=(28.508473399, -65.316666667, -45), x_dir=(-0.9830508068705752, 0.18333333333333338, 0), z_dir=(0.1833333333333334, 0.9830508068705752, 0)), Plane(origin=(28.508473399, -65.316666667, -60), x_dir=(0, 0, 1), z_dir=(0.1833333333333334, 0.9830508068705752, 0))) as fillet6_piece_17:
        with BuildLine():
            CenterArc((FILLET6_R, -FILLET6_R), FILLET6_R, 90, 90)
            Line((0, -FILLET6_R), (0, 0))
            Line((0, 0), (FILLET6_R, 0))
        make_face()
    extrude(amount=58.983048412, mode=Mode.SUBTRACT)
    with BuildSketch(Plane(origin=(0, 0, -60), x_dir=(0.9830508068705752, -0.18333333333333324, 0), z_dir=(-0.18333333333333324, -0.9830508068705752, 0))) as fillet6_piece_18:
        with BuildLine():
            CenterArc((40 - FILLET6_R, FILLET6_R), FILLET6_R, 270, 90)
            Line((40 - FILLET6_R, 0), (40, 0))
            Line((40, 0), (40, FILLET6_R))
        make_face()
    revolve(axis=Axis((0, 0, -60), (0, 0, 1)), revolution_arc=164.328933054, mode=Mode.SUBTRACT)
    with BuildSketch(Plane(origin=(0, 0, 45), x_dir=(0.9830508068705752, -0.18333333333333324, 0), z_dir=(-0.18333333333333324, -0.9830508068705752, 0))) as fillet6_piece_19:
        with BuildLine():
            CenterArc((40 - FILLET6_R, FILLET6_R), FILLET6_R, 270, 90)
            Line((40, FILLET6_R), (40, 0))
            Line((40, 0), (40 - FILLET6_R, 0))
        make_face()
    revolve(axis=Axis((0, 0, 45), (0, 0, 1)), revolution_arc=164.328933054, mode=Mode.SUBTRACT)
    with BuildSketch(Plane(origin=(0, 0, 60), x_dir=(0.9830508068705752, -0.18333333333333324, 0), z_dir=(-0.18333333333333324, -0.9830508068705752, 0))) as fillet6_piece_20:
        with BuildLine():
            CenterArc((40 - FILLET6_R, -FILLET6_R), FILLET6_R, 0, 90)
            Line((40 - FILLET6_R, 0), (40, 0))
            Line((40, 0), (40, -FILLET6_R))
        make_face()
    revolve(axis=Axis((0, 0, 60), (0, 0, 1)), revolution_arc=164.328933054, mode=Mode.SUBTRACT)

    # Fillet7
    fillet7_edges = [part.edges().sort_by_distance(p)[0] for p in [
        (0, -20, 45),
        (20, 0, 35),
        (0, 0, 45),
        (-20, 0, 35),
        (0, -20, 25),
        (-12.5, 0, 25),
        (12.5, 0, 25),
        (0, -5, 25),
        (0, -20, -25),
        (-20, 0, -35),
        (-12.5, 0, -25),
        (20, 0, -35),
        (0, -20, -45),
        (0, 0, -45),
        (12.5, 0, -25),
        (0, -5, -25),
    ]]
    fillet(fillet7_edges, radius=FILLET7_R)

    # Fillet8
    fillet8_edges = [part.edges().sort_by_distance(p)[0] for p in [
        (-13, -24, 0),
        (-13, -74, 0),
        (3, -74, 0),
        (3, -24, 0),
    ]]
    fillet(fillet8_edges, radius=FILLET8_R)

    # Fillet9
    fillet9_edges = [part.edges().sort_by_distance(p)[0] for p in [
        (-22.215381939, -49, 35),
        (-37.215381939, -49, 35),
        (-22.215381939, -49, -35),
        (-37.215381939, -49, -35),
    ]]
    fillet(fillet9_edges, radius=FILLET9_R - 0.0001)  # a hair under: the kernel refuses the full size

    # Sketch35 → Cut-Extrude12 (cut, through all)
    with BuildSketch(Plane.XY.offset(60)):
        with Locations((-5, -34)):
            Circle(SKETCH35_R)
        with Locations((-5, -64)):
            Circle(SKETCH35_R)
    extrude(amount=-CUT_EXTRUDE12_DEPTH, mode=Mode.SUBTRACT)

    # Sketch38 → Cut-Extrude15 (cut, through all)
    with BuildSketch(Plane.XY.offset(-45)):
        with BuildLine():
            Line((-34.982538166, 17.24012829), (-60.153387582, -33.834909294))
            ThreePointArc((-60.153387582, -33.834909294), (-23.605696117, -41.303192198), (-46.311234667, -70.89994067))
            Line((-46.311234667, -70.89994067), (-10.854073996, -85.810638847))
            ThreePointArc((-10.854073996, -85.810638847), (13.280482176, -84.65012765), (27.525422592, -65.133333333))
            Line((27.525422592, -65.133333333), (38.338981468, -7.15))
            ThreePointArc((38.338981468, -7.15), (12.309996645, 37.006269504), (-34.982538166, 17.24012829))
        make_face()
        with BuildLine():
            ThreePointArc((-11, -74), (-12.414213562, -73.414213562), (-13, -72))
            Line((-13, -72), (-13, -26))
            ThreePointArc((-13, -26), (-12.414213562, -24.585786438), (-11, -24))
            Line((-11, -24), (1, -24))
            ThreePointArc((1, -24), (2.414213562, -24.585786438), (3, -26))
            Line((3, -26), (3, -72))
            ThreePointArc((3, -72), (2.414213562, -73.414213562), (1, -74))
            Line((1, -74), (-11, -74))
        make_face(mode=Mode.SUBTRACT)
        with BuildLine():
            ThreePointArc((20.970893957, -1.105263158), (0, -21), (-20.970893957, -1.105263158))
            ThreePointArc((-20.970893957, -1.105263158), (-20.424618461, 0.376494403), (-18.973665961, 1))
            Line((-18.973665961, 1), (18.973665961, 1))
            ThreePointArc((18.973665961, 1), (20.424618461, 0.376494403), (20.970893957, -1.105263158))
        make_face(mode=Mode.SUBTRACT)
    extrude(amount=-CUT_EXTRUDE15_DEPTH, mode=Mode.SUBTRACT)


with BuildPart() as body_2:
    # of the pieces the cut leaves, the one that is kept (cut_extrude15_keep)
    add(part.part.solids().sort_by_distance((-13, -26, 45))[0])

    # Sketch41 → Cut-Extrude16 (cut, through all)
    with BuildSketch(Plane(origin=(0, 0, 45), x_dir=(-1, 0, 0), z_dir=(0, 0, -1))):
        Rectangle(SKETCH41_W, SKETCH41_H)
        with BuildLine():
            Line((13, -72), (13, -26))
            ThreePointArc((13, -26), (12.414213562, -24.585786438), (11, -24))
            Line((11, -24), (-1, -24))
            ThreePointArc((-1, -24), (-2.414213562, -24.585786438), (-3, -26))
            Line((-3, -26), (-3, -72))
            ThreePointArc((-3, -72), (-2.414213562, -73.414213562), (-1, -74))
            Line((-1, -74), (11, -74))
            ThreePointArc((11, -74), (12.414213562, -73.414213562), (13, -72))
        make_face(mode=Mode.SUBTRACT)
    extrude(amount=-CUT_EXTRUDE16_DEPTH, mode=Mode.SUBTRACT)


with BuildPart() as body_2_2:
    # of the pieces the cut leaves, the one that is kept (cut_extrude16_keep)
    add(body_2.part.solids().sort_by_distance((-13, -72, -60))[0])

    # Sketch42 → Boss-Extrude12 (add, symmetric)
    with BuildSketch(Plane.XY):
        with Locations((-5, -34)):
            Circle(SKETCH42_R)
        with Locations((-5, -64)):
            Circle(SKETCH42_R)
    extrude(amount=BOSS_EXTRUDE12_DEPTH, both=True)

    # Sketch44 → Cut-Extrude17 (cut, symmetric)
    # profile 1 of 2: a face of its own
    with BuildSketch(Plane(origin=(0, 0, -48), x_dir=(-1, 0, 0), z_dir=(0, 0, -1))):
        Polygon((2.286453735, -38.7), (7.713546265, -38.7), (10.42709253, -34), (7.713546265, -29.3), (2.286453735, -29.3), (-0.42709253, -34), align=None)
        with Locations(Location((5, -34, 0), (0, 0, 180))):
            Circle(SKETCH44_R, mode=Mode.SUBTRACT)
    # profile 2 of 2: a face of its own
    with BuildSketch(Plane(origin=(0, 0, -48), x_dir=(-1, 0, 0), z_dir=(0, 0, -1))):
        Polygon((-3, -38.7), (-3, -29.3), (2.286453735, -29.3), (-0.42709253, -34), (2.286453735, -38.7), align=None)
    cut_extrude17 = extrude(amount=CUT_EXTRUDE17_DEPTH, both=True, mode=Mode.SUBTRACT)

    # Mirror15: Cut-Extrude17 across plane
    add(cut_extrude17.mirror(Plane(origin=(0, -49, 0), x_dir=(0, 0, 1), z_dir=(0, -1, 0))), mode=Mode.SUBTRACT)

    # Mirror16: Cut-Extrude17 across plane
    add(cut_extrude17.mirror(Plane.XY), mode=Mode.SUBTRACT)

    # Mirror16 copy 1 sketch → Mirror16 copy 1 (cut, symmetric)
    # profile 1 of 2: a face of its own
    with BuildSketch(Plane(origin=(0, -98, 48), x_dir=(-1, 0, 0), z_dir=(0, 0, 1))):
        Polygon((2.286453735, -38.7), (7.713546265, -38.7), (10.42709253, -34), (7.713546265, -29.3), (2.286453735, -29.3), (-0.42709253, -34), align=None)
        with Locations(Location((5, -34, 0), (0, 0, 180))):
            Circle(MIRROR16_COPY_1_SKETCH_R, mode=Mode.SUBTRACT)
    # profile 2 of 2: a face of its own
    with BuildSketch(Plane(origin=(0, -98, 48), x_dir=(-1, 0, 0), z_dir=(0, 0, 1))):
        Polygon((-3, -38.7), (-3, -29.3), (2.286453735, -29.3), (-0.42709253, -34), (2.286453735, -38.7), align=None)
    extrude(amount=MIRROR16_COPY_1_DEPTH, both=True, mode=Mode.SUBTRACT)


solid = body_2_2.part
